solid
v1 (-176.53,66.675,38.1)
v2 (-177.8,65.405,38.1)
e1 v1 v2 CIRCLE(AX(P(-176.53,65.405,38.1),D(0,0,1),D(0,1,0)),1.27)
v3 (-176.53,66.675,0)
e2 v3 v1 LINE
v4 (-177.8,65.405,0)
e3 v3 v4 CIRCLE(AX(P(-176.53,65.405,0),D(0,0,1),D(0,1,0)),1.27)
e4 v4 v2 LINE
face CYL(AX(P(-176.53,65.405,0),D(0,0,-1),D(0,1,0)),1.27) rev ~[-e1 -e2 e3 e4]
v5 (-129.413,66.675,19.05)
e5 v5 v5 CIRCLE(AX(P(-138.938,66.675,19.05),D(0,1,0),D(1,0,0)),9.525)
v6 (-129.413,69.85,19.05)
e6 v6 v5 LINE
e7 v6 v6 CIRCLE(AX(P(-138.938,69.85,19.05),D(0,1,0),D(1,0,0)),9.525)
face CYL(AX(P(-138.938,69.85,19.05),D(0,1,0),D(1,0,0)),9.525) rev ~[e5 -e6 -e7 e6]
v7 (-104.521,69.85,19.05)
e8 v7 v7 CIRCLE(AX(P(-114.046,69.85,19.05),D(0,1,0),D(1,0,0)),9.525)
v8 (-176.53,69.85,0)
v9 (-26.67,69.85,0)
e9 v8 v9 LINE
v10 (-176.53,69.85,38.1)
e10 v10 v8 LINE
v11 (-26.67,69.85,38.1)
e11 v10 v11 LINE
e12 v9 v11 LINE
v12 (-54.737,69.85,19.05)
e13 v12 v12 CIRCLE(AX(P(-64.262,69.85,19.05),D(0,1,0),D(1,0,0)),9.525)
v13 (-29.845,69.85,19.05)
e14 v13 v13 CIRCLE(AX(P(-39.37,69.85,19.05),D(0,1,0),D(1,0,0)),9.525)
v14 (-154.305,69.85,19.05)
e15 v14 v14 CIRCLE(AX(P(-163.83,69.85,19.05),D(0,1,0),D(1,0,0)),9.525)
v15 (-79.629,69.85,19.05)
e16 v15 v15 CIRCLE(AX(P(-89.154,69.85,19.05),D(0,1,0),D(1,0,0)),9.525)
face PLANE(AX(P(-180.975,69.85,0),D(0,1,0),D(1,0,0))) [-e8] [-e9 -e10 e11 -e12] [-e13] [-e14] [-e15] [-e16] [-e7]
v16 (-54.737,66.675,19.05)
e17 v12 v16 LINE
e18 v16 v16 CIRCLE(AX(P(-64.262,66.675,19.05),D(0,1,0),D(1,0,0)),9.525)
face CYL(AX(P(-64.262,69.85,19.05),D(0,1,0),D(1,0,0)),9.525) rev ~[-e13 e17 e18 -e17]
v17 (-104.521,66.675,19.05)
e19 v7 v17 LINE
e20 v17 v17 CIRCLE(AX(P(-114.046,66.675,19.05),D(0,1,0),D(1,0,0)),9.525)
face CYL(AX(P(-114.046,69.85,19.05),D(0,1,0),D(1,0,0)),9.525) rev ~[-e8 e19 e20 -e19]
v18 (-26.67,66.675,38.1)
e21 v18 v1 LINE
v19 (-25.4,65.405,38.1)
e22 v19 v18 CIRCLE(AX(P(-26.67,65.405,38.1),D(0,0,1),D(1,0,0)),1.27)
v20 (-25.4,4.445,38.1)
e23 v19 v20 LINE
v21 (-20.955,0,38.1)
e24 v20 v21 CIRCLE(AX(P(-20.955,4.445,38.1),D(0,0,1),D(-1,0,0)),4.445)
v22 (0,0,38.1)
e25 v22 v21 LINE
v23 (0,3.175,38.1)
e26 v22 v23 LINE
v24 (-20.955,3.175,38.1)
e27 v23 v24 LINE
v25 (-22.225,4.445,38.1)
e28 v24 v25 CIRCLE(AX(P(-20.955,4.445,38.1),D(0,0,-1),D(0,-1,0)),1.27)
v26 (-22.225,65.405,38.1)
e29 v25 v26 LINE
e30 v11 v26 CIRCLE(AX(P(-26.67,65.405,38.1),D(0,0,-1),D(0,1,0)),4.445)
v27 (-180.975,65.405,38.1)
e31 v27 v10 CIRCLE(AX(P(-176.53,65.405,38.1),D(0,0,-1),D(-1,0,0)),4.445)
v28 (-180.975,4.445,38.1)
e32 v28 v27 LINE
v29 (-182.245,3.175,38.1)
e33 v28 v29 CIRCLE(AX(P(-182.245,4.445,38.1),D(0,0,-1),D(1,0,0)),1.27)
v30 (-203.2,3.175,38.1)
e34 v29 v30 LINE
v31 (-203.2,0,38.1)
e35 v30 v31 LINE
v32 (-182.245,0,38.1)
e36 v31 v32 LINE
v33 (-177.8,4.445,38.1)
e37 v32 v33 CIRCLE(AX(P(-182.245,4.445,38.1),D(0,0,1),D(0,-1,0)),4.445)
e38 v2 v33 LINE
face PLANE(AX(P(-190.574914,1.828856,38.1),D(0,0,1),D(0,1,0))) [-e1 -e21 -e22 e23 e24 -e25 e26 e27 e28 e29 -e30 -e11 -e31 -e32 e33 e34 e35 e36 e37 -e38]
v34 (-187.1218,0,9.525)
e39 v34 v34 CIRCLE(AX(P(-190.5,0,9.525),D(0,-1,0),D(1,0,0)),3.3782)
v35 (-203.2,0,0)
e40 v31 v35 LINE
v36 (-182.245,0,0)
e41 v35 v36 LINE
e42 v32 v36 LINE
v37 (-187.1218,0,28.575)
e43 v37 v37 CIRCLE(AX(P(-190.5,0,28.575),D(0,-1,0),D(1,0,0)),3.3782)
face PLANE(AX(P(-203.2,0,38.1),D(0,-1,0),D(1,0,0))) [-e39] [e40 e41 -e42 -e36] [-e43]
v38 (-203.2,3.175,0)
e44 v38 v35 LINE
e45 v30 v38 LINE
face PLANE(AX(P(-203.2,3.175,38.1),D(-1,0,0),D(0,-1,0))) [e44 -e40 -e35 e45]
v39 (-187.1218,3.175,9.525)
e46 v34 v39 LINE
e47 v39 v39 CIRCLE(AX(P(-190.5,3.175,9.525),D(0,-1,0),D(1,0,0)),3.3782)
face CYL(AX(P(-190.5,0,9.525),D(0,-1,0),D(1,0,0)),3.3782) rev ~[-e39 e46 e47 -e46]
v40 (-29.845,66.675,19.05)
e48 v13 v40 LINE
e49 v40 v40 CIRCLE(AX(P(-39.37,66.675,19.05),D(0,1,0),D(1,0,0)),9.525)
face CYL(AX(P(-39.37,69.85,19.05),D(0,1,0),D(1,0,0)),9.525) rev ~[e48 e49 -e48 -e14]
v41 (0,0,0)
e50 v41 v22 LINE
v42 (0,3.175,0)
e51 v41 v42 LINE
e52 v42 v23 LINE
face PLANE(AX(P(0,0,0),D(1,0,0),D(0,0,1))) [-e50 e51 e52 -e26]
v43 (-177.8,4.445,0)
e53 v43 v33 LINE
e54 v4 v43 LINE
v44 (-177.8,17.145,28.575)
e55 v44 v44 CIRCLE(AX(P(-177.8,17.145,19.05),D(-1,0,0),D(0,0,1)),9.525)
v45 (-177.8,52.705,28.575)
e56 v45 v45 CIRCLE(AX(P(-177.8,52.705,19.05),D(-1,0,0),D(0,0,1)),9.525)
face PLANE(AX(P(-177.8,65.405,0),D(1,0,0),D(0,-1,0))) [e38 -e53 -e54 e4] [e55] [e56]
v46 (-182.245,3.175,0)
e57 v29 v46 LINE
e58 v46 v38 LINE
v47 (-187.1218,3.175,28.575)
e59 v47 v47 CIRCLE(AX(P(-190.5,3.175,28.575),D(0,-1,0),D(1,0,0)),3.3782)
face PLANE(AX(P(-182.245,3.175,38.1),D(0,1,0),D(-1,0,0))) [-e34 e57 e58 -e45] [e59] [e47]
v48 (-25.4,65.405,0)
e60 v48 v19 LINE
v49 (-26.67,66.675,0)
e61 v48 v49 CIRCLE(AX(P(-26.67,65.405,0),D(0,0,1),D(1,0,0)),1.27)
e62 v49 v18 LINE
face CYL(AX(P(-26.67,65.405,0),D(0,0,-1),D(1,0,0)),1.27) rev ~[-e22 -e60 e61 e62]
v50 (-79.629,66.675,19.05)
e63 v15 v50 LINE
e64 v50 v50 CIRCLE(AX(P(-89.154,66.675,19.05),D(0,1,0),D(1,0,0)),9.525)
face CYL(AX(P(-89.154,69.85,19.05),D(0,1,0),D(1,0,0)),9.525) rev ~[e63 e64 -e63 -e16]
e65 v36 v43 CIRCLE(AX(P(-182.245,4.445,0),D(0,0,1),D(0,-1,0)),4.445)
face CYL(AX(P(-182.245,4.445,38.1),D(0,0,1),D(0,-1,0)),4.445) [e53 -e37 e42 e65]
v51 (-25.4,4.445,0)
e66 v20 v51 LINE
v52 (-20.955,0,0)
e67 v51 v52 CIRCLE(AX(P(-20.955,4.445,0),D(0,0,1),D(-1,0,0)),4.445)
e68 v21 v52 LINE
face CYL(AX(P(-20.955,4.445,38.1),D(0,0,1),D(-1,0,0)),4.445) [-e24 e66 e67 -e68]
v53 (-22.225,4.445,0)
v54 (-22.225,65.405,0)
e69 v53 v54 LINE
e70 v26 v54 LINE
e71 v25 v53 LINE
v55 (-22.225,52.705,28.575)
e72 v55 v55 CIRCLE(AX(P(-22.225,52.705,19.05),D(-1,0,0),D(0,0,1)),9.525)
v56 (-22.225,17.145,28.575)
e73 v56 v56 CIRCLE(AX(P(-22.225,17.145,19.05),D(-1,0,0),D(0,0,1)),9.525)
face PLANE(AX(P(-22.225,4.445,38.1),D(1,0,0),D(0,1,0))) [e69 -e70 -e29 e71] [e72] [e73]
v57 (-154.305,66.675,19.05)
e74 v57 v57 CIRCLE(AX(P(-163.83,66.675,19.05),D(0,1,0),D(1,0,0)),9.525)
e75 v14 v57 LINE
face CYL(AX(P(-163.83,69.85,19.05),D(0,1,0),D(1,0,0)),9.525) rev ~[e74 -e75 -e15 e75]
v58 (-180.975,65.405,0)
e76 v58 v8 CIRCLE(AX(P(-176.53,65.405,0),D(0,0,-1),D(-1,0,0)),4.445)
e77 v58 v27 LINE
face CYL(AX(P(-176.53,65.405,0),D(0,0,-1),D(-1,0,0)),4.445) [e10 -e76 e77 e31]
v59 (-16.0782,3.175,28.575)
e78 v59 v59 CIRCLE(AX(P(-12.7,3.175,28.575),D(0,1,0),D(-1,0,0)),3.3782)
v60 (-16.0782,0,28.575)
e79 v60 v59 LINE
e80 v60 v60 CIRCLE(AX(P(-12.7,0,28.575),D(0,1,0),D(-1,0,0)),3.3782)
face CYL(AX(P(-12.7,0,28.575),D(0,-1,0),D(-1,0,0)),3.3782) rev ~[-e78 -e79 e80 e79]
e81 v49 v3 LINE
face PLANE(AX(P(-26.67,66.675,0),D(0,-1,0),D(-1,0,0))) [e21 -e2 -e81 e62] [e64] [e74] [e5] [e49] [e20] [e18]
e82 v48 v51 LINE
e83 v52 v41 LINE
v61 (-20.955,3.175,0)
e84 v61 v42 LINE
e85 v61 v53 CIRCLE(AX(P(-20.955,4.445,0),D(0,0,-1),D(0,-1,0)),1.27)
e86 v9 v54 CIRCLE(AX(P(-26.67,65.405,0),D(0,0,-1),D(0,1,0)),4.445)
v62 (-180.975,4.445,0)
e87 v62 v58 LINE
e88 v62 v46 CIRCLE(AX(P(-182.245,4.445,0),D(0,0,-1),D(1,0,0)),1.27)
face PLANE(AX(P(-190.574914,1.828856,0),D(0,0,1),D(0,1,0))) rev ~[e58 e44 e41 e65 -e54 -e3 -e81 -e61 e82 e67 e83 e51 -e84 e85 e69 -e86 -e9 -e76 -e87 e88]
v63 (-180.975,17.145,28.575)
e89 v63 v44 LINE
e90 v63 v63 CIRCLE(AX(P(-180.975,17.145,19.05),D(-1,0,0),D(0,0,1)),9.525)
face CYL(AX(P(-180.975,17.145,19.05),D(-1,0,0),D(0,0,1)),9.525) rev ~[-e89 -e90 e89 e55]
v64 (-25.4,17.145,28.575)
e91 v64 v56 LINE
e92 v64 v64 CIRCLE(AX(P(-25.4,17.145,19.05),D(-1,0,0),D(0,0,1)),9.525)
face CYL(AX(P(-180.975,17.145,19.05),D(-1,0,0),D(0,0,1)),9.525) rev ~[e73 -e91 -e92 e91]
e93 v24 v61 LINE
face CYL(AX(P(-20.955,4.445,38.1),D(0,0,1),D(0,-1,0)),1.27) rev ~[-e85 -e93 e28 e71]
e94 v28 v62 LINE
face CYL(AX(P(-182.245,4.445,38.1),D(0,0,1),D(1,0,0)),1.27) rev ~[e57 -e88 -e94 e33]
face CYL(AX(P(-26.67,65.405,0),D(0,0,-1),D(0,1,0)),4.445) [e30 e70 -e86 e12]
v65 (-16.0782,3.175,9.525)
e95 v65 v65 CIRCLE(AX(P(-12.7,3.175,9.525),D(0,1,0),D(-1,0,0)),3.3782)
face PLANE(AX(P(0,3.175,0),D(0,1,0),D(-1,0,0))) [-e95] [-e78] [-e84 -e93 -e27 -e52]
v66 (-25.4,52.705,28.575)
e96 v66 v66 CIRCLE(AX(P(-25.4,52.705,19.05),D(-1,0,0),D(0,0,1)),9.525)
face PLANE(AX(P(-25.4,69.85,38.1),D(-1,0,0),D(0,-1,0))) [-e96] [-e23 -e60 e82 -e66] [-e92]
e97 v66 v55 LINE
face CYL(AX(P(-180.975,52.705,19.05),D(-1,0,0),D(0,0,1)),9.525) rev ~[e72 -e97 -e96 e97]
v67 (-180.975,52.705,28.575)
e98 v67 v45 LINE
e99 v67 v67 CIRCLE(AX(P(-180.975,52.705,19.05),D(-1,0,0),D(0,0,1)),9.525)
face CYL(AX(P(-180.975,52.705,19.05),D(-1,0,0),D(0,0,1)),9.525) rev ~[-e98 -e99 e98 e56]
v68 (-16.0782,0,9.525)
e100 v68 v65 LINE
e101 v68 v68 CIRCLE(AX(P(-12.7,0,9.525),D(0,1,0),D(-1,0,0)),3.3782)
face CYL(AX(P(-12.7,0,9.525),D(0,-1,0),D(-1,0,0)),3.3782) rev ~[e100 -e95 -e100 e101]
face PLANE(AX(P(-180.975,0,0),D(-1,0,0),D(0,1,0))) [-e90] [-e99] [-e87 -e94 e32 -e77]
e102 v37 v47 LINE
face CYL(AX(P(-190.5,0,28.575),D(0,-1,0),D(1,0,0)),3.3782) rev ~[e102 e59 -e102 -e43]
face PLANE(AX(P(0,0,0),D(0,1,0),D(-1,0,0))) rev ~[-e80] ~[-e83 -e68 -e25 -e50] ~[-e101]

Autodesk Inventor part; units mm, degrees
ref_plane "YZ Plane" through (0, 0, 0) normal (1, 0, 0) x (0, 1, 0)
ref_plane "XZ Plane" through (0, 0, 0) normal (0, 1, 0) x (-1, 0, 0)
ref_plane "XY Plane" through (0, 0, 0) normal (0, 0, 1) x (1, 0, 0)
sketch "Sketch1" plane through (0, 0, 0) normal (0, 1, 0) x (-1, 0, 0)
  line L0 (0, 0) -> (0, 38.1)
  line L1 (0, 38.1) -> (25.4, 38.1)
  line L2 (25.4, 38.1) -> (25.4, 0)
  line L3 (25.4, 0) -> (0, 0)
  line L4 (12.7, 38.1) -> (12.7, 0) construction
  circle A0 centre (12.7, 28.575) radius 3.3782
  circle A1 centre (12.7, 9.525) radius 3.3782
  dimension "d0" = 38.1
  dimension "d1" = 25.4
  dimension "d2" = 6.7564
  dimension "d3" = 19.05
  dimension "d4" = 9.525
extrude "Plate1" add sketch "Sketch1" along normal blind 3.175
sketch "Sketch2" plane through (-22.225, 0, 38.1) normal (-1, 0, 0) x (0, -1, 0)
  line L0 (0, -38.1) -> (0, 0)
  line L1 (0, 0) -> (-69.85, 0)
  line L2 (-69.85, 0) -> (-69.85, -38.1)
  line L3 (-69.85, -38.1) -> (0, -38.1)
edge flange "Flange1" height 69.85 angle 90 thickness 3.175 bend radius 1.27 thickness toward (-1, 0, 0) relief tear relief width 3.175 relief depth 1.5875 edges at (-25.4, 3.175, 19.05) wall of the first edge with corners at (-22.225, 0, 0) (-22.225, 0, 38.1) (-22.225, 69.85, 38.1) (-22.225, 69.85, 0)
bend "Bend1"
corner "Corner1"
sketch "Sketch3" plane through (-22.225, 66.675, 0) normal (0, 1, 0) x (-1, 0, 0)
  line L0 (0, 38.1) -> (0, 0)
  line L1 (0, 0) -> (158.75, 0)
  line L2 (158.75, 0) -> (158.75, 38.1)
  line L3 (158.75, 38.1) -> (0, 38.1)
edge flange "Flange2" height 158.75 angle 90 thickness 3.175 bend radius 1.27 thickness toward (0, 1, 0) relief tear relief width 3.175 relief depth 1.5875 edges at (-25.4, 69.85, 19.05) wall of the first edge with corners at (-22.225, 66.675, 38.1) (-22.225, 66.675, 0) (-180.975, 66.675, 0) (-180.975, 66.675, 38.1)
bend "Bend2"
corner "Corner2"
sketch "Sketch4" plane through (-177.8, 69.85, 0) normal (-1, 0, 0) x (0, -1, 0)
  line L0 (0, 38.1) -> (0, 0)
  line L1 (0, 0) -> (69.85, 0)
  line L2 (69.85, 0) -> (69.85, 38.1)
  line L3 (69.85, 38.1) -> (0, 38.1)
edge flange "Flange3" height 69.85 angle 90 thickness 3.175 bend radius 1.27 thickness toward (-1, 0, 0) relief tear relief width 3.175 relief depth 1.5875 edges at (-180.975, 66.675, 19.05) wall of the first edge with corners at (-177.8, 69.85, 38.1) (-177.8, 69.85, 0) (-177.8, 0, 0) (-177.8, 0, 38.1)
bend "Bend3"
corner "Corner3"
sketch "Sketch5" plane through (-177.8, 3.175, 38.1) normal (0, -1, 0) x (1, 0, 0)
  line L0 (0, -38.1) -> (0, 0)
  line L1 (0, 0) -> (-25.4, 0)
  line L2 (-25.4, 0) -> (-25.4, -38.1)
  line L3 (-25.4, -38.1) -> (0, -38.1)
edge flange "Flange4" height 25.4 angle 90 thickness 3.175 bend radius 1.27 thickness toward (0, -1, 0) relief tear relief width 3.175 relief depth 1.5875 edges at (-180.975, 0, 19.05) wall of the first edge with corners at (-177.8, 3.175, 0) (-177.8, 3.175, 38.1) (-203.2, 3.175, 38.1) (-203.2, 3.175, 0)
bend "Bend4"
corner "Corner4"
sketch "Sketch6" plane through (-203.2, 0, 0) normal (0, -1, 0) x (1, 0, 0)
  line L0 (0, 38.1) -> (20.955, 38.1) projected
  line L1 (0, 0) -> (0, 38.1) projected
  line L2 (20.955, 0) -> (0, 0) projected
  line L3 (12.7, 38.1) -> (12.7, 0) construction
  circle A0 centre (12.7, 28.575) radius 3.3782
  circle A1 centre (12.7, 9.525) radius 3.3782
  point P0 (203.2, 0)
  dimension "d46" = 12.7
  dimension "d47" = 6.7564
  dimension "d48" = 19.05
  dimension "d49" = 9.525
extrude "Cut1" cut sketch "Sketch6" against normal blind 3.175
sketch "Sketch7" plane through (-26.67, 69.85, 38.1) normal (0, 1, 0) x (1, 0, 0)
  line L0 (-149.86, 38.1) -> (-149.86, 0) projected
  line L1 (0, 0) -> (0, 38.1) projected
  circle A0 centre (-137.16, 19.05) radius 9.525
  line L2 (-149.86, 19.05) -> (0, 19.05) construction
  circle A1 centre (-112.268, 19.05) radius 9.525
  circle A2 centre (-87.376, 19.05) radius 9.525
  circle A3 centre (-62.484, 19.05) radius 9.525
  circle A4 centre (-37.592, 19.05) radius 9.525
  circle A5 centre (-12.7, 19.05) radius 9.525
  point P0 (26.67, 38.1)
  dimension "d52" = 149.86
  dimension "d53" = 12.7
  dimension "d56" = 24.892
  dimension "d61" = 19.05
extrude "Cut2" cut sketch "Sketch7" against normal blind 3.175
sketch "Sketch8" plane through (-180.975, 65.405, 0) normal (-1, 0, 0) x (0, 0, 1)
  line L0 (0, -60.96) -> (38.1, -60.96) projected
  line L1 (38.1, 0) -> (0, 0) projected
  line L2 (19.05, 0) -> (19.05, -60.96) construction
  circle A0 centre (19.05, -12.7) radius 9.525
  circle A1 centre (19.05, -48.26) radius 9.525
  point P0 (0, -65.405)
  dimension "d64" = 19.05
  dimension "d66" = 12.7
  dimension "d67" = 12.7
extrude "Cut3" cut sketch "Sketch8" against normal blind 5080
equation "\"d50\" = Thickness"
equation "\"d56\" = -0.4 * d53 + 0.2 * d52"
equation "\"d62\" = Thickness"
equation "\"d6\" = BendReliefWidth"
equation "\"d7\" = BendReliefDepth"
equation "\"d8\" = MinimumRemnant"
equation "\"d9\" = BendRadius"
equation "\"d13\" = CornerReliefSize"
equation "\"d14\" = GapSize"
equation "\"d15\" = JacobiRadiusSize"
equation "\"d16\" = BendReliefWidth"
equation "\"d17\" = BendReliefDepth"
equation "\"d18\" = MinimumRemnant"
equation "\"d19\" = BendRadius"
equation "\"d23\" = CornerReliefSize"
equation "\"d24\" = GapSize"
equation "\"d25\" = JacobiRadiusSize"
equation "\"d26\" = BendReliefWidth"
equation "\"d27\" = BendReliefDepth"
equation "\"d28\" = MinimumRemnant"
equation "\"d29\" = BendRadius"
equation "\"d33\" = CornerReliefSize"
equation "\"d34\" = GapSize"
equation "\"d35\" = JacobiRadiusSize"
equation "\"d36\" = BendReliefWidth"
equation "\"d37\" = BendReliefDepth"
equation "\"d38\" = MinimumRemnant"
equation "\"d39\" = BendRadius"
equation "\"d43\" = CornerReliefSize"
equation "\"d44\" = GapSize"
equation "\"d45\" = JacobiRadiusSize"
equation "\"BendRadius\" = Thickness"
equation "\"BendReliefWidth\" = Thickness"
equation "\"BendReliefDepth\" = 0.5 * Thickness"
equation "\"CornerReliefSize\" = 4 * Thickness"
equation "\"MinimumRemnant\" = 2 * Thickness"
equation "\"TransitionRadius\" = BendRadius"
equation "\"JacobiRadiusSize\" = BendRadius"
equation "\"GapSize\" = Thickness"
equation "\"d5\" = BendRadius"
equation "\"Thickness\" = 3.175"
properties part number "M - Lower Rail Connector Bracket 1" material "Aluminum 6061"
